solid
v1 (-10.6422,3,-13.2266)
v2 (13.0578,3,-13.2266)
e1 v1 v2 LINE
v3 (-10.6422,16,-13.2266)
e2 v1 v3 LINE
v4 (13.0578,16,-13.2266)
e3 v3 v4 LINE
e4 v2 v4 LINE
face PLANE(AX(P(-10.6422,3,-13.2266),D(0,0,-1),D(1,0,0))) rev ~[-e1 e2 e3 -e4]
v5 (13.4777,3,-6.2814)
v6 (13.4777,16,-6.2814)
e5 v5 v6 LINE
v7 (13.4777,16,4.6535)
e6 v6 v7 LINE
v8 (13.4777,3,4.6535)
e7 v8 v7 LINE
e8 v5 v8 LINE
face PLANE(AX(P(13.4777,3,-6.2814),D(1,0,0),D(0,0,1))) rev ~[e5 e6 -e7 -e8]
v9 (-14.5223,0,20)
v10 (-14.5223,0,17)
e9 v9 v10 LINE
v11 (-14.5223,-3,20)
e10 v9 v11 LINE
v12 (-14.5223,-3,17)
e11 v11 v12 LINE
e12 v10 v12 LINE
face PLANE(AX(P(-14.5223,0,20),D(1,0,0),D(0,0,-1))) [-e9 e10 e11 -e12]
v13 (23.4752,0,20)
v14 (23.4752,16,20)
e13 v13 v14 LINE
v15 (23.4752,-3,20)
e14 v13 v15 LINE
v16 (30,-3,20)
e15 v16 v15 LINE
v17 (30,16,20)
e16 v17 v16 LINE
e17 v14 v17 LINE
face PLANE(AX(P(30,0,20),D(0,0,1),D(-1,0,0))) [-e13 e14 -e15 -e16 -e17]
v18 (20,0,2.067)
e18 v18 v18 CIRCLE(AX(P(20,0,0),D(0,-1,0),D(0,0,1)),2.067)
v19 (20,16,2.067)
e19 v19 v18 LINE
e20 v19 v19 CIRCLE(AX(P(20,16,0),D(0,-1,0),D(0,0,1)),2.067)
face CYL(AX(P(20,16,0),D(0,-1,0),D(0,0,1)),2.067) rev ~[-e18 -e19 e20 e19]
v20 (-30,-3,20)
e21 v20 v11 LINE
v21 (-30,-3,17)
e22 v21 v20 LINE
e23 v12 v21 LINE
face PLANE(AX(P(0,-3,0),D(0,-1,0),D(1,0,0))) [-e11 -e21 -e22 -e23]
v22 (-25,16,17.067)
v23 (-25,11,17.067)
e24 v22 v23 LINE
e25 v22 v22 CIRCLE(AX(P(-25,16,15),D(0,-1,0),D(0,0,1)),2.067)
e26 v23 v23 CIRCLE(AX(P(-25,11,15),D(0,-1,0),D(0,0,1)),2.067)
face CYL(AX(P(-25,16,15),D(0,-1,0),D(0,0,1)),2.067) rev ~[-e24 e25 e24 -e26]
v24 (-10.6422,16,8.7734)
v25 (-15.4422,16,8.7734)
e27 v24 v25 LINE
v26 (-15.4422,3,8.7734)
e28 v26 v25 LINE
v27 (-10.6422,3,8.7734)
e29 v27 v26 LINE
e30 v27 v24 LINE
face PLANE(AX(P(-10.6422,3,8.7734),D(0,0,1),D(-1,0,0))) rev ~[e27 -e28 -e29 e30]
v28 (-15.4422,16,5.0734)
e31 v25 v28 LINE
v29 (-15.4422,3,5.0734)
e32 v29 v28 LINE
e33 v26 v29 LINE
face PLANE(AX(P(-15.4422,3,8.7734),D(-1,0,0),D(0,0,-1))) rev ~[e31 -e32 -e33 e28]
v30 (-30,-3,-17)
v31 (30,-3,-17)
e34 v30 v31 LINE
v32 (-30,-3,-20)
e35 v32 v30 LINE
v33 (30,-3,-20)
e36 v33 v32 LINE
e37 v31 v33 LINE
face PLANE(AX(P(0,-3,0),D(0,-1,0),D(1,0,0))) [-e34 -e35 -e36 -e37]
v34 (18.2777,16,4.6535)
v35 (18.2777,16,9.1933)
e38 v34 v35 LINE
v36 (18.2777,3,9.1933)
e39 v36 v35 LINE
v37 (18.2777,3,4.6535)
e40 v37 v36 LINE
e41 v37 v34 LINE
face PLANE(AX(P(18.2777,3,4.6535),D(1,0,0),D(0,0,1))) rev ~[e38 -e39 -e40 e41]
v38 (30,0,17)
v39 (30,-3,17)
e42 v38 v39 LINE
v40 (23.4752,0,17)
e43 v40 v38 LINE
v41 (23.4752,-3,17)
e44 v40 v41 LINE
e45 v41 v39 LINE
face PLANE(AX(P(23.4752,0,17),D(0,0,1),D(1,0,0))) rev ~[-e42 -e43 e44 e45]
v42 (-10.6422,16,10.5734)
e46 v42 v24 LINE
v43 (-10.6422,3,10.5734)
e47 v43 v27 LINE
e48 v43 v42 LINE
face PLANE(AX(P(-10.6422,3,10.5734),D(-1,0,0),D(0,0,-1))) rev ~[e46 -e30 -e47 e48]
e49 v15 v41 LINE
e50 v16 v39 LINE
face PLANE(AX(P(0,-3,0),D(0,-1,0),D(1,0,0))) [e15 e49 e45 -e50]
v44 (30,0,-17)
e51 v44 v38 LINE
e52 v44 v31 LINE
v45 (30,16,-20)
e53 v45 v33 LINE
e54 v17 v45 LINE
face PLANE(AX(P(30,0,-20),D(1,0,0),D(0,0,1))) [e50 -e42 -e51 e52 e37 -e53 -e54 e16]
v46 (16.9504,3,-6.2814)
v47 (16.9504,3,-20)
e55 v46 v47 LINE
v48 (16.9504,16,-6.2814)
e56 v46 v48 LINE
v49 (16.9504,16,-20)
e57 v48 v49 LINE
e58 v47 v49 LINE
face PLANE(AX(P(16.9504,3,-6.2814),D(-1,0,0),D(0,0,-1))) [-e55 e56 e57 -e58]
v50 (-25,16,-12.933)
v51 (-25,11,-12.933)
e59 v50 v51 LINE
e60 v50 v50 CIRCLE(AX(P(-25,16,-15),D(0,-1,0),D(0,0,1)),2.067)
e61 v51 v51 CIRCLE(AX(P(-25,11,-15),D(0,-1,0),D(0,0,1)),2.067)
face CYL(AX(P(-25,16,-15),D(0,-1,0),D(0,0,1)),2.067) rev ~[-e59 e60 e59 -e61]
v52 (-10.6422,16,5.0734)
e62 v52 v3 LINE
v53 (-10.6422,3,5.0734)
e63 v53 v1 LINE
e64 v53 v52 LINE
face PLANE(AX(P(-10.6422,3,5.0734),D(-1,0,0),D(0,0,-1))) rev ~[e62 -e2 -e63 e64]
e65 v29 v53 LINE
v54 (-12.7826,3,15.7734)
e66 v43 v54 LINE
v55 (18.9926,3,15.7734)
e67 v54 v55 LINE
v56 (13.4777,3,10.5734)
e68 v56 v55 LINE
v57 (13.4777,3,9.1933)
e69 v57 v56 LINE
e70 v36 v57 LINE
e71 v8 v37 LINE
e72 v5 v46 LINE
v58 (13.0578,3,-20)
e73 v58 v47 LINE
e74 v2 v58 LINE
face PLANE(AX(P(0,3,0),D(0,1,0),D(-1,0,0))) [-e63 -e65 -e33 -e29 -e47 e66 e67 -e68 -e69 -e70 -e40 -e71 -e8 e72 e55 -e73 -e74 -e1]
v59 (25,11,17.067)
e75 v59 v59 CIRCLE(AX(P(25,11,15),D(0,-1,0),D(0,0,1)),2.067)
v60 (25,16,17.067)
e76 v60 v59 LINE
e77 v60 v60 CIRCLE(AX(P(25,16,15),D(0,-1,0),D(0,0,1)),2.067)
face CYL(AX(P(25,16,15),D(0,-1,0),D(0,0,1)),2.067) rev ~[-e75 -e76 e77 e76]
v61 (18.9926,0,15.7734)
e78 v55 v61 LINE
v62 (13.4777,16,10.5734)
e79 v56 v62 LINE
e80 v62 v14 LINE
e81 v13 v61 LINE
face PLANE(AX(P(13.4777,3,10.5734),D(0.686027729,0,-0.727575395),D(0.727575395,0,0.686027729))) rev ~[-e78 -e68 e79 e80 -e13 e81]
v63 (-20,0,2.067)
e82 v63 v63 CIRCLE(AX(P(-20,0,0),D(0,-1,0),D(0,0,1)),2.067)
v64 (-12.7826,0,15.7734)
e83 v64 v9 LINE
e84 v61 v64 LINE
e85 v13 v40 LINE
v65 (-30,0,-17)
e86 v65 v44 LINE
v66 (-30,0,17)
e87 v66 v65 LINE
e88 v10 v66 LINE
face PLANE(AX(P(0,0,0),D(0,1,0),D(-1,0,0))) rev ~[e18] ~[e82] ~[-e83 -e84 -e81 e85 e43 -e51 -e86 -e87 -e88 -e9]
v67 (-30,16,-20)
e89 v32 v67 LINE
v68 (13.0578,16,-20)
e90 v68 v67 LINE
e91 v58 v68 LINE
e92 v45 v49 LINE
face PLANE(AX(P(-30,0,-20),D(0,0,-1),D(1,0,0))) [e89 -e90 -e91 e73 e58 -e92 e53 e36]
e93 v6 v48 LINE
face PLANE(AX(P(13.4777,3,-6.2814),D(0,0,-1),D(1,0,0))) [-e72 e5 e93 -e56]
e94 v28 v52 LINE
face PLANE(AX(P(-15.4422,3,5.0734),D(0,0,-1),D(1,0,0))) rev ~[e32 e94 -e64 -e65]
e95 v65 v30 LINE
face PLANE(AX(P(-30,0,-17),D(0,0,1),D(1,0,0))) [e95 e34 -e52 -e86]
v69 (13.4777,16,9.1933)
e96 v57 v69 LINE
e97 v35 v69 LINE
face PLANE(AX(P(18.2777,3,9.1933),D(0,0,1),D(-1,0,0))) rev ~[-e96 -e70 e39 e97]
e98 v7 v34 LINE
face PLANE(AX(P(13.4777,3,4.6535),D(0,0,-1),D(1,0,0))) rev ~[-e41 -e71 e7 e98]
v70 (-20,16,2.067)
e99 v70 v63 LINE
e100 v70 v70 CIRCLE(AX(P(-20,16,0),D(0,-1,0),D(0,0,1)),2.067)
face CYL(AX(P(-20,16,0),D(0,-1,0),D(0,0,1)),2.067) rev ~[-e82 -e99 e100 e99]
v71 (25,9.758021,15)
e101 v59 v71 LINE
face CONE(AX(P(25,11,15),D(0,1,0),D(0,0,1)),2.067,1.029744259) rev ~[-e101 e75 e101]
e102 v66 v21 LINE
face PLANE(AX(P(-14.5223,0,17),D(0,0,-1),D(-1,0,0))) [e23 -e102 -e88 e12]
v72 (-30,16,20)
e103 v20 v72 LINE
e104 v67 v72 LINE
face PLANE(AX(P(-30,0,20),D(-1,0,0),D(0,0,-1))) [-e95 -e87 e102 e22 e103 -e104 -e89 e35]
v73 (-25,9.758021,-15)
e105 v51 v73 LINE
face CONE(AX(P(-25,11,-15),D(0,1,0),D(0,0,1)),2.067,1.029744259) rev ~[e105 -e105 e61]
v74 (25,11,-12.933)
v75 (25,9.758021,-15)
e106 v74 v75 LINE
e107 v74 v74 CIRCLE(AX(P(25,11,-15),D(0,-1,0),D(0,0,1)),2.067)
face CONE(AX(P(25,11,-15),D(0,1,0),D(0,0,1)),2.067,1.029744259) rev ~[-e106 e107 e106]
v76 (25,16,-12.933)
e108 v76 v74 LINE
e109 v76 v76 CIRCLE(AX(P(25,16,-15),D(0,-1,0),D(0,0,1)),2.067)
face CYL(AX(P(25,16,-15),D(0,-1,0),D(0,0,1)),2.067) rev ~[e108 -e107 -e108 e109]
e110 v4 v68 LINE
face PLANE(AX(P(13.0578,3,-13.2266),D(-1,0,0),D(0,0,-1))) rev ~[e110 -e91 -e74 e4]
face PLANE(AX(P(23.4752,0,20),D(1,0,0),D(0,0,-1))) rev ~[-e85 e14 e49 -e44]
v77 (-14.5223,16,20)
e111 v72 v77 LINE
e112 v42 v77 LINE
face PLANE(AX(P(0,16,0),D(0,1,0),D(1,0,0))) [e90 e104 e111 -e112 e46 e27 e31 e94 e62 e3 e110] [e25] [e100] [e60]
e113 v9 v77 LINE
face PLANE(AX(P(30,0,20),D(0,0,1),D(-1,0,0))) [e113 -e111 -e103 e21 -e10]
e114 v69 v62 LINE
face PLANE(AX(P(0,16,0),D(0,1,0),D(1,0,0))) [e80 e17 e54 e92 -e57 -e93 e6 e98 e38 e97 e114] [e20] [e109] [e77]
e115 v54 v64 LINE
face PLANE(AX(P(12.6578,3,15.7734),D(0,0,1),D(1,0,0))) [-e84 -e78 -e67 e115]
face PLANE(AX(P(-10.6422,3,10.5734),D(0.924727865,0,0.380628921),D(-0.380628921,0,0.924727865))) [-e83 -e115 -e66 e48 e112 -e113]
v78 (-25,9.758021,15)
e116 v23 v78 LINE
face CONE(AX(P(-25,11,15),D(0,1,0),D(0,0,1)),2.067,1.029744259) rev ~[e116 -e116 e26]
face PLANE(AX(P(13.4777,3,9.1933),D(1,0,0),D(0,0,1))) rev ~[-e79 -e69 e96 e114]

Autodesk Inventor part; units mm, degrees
ref_plane "YZ Plane" through (0, 0, 0) normal (1, 0, 0) x (0, 1, 0)
ref_plane "XZ Plane" through (0, 0, 0) normal (0, 1, 0) x (-1, 0, 0)
ref_plane "XY Plane" through (0, 0, 0) normal (0, 0, 1) x (1, 0, 0)
sketch "Szkic1" plane through (0, 0, 0) normal (0, 1, 0) x (-1, 0, 0)
  line L0 (30, -20) -> (-30, -20)
  line L1 (-30, -20) -> (-30, 20)
  line L2 (-30, 20) -> (30, 20)
  line L3 (30, 20) -> (30, -20)
  line L4 (30, -20) -> (-30, 20) construction
  line L5 (-30, -20) -> (30, 20) construction
  point P0 (0, 0)
  dimension "d0" = 60
  dimension "d1" = 40
extrude "Wyciągnięcie proste1" add sketch "Szkic1" along normal blind 3
sketch "Szkic6" plane through (0, 3, 0) normal (0, 1, 0) x (1, 0, 0)
  line L0 (17.3578, -5.5734) -> (12.5578, -5.5734) projected
  line L1 (12.5578, -5.5734) -> (12.5578, 12.7266) projected
  line L2 (12.5578, 12.7266) -> (-10.1422, 12.7266) projected
  line L3 (-10.1422, -5.5734) -> (-10.1422, 12.7266) projected
  line L4 (-10.1422, -5.5734) -> (-14.9422, -5.5734) projected
  line L5 (-14.9422, -5.5734) -> (-14.9422, -8.2734) projected
  line L6 (-10.1422, -8.2734) -> (-14.9422, -8.2734) projected
  line L7 (-10.1422, -8.2734) -> (-10.1422, -10.0734) projected
  line L8 (-10.1422, -10.0734) -> (12.5578, -10.0734) construction
  line L9 (12.5578, -8.2734) -> (12.5578, -10.0734) projected
  line L10 (17.3578, -8.2734) -> (12.5578, -8.2734) projected
  line L11 (17.3578, -5.5734) -> (17.3578, -8.2734) projected
  line L12 (-8.8922, -2.4734) -> (11.3078, -2.4734) projected
  line L13 (-8.8922, 7.7266) -> (-8.8922, -2.4734) projected
  line L14 (11.3078, 7.7266) -> (-8.8922, 7.7266) projected
  line L15 (11.3078, -2.4734) -> (11.3078, 7.7266) projected
  line L16 (-30, -20) -> (30, -20) projected
  line L17 (30, -20) -> (30, 20) projected
  line L18 (30, -20) -> (30, 20)
  line L19 (-30, 20) -> (-30, -20)
  line L20 (-30, -20) -> (-14.5223, -20)
  line L21 (23.4752, -20) -> (30, -20)
  line L22 (-10.6422, 13.2266) -> (13.0578, 13.2266)
  line L23 (13.4777, 6.2814) -> (13.4777, -4.6535)
  line L24 (13.4777, -4.6535) -> (18.2777, -4.6535)
  line L25 (18.2777, -4.6535) -> (18.2777, -9.1933)
  line L26 (18.2777, -9.1933) -> (13.4777, -9.1933)
  line L27 (13.4777, -9.1933) -> (13.4777, -10.5734)
  line L28 (-10.6422, -10.5734) -> (-10.6422, -8.7734)
  line L29 (-10.6422, -8.7734) -> (-15.4422, -8.7734)
  line L30 (-15.4422, -8.7734) -> (-15.4422, -5.0734)
  line L31 (-15.4422, -5.0734) -> (-10.6422, -5.0734)
  line L32 (-10.6422, -5.0734) -> (-10.6422, 13.2266)
  line L33 (13.4777, -10.5734) -> (23.4752, -20)
  line L34 (-10.6422, -10.5734) -> (-14.5223, -20)
  line L35 (13.4777, 6.2814) -> (16.9504, 6.2814)
  line L36 (16.9504, 6.2814) -> (16.9504, 20)
  line L37 (13.0578, 13.2266) -> (13.0578, 20)
  line L38 (30, 20) -> (16.9504, 20)
  line L39 (13.0578, 20) -> (-30, 20)
  point P0 (0, 0)
  dimension "d4" = 0.5
extrude "Wyciągnięcie proste2" add sketch "Szkic6" along normal blind 13 contours L19 L39 L37 L22 L32 L31 L30 L29 L28 L34 L16 | L33 L27 L26 L25 L24 L23 L35 L36 L38 L17 L16
sketch "Szkic7" plane through (0, 3, 0) normal (0, 1, 0) x (1, 0, 0)
  line L0 (13.0578, 20) -> (13.0578, 13.2266) projected
  line L1 (13.0578, 13.2266) -> (-10.6422, 13.2266) projected
  line L2 (-10.6422, 13.2266) -> (-10.6422, -5.0734) projected
  line L3 (-10.6422, -5.0734) -> (-15.4422, -5.0734) projected
  line L4 (-15.4422, -5.0734) -> (-15.4422, -8.7734) projected
  line L5 (-15.4422, -8.7734) -> (-10.6422, -8.7734) projected
  line L6 (-10.6422, -8.7734) -> (-10.6422, -10.5734) projected
  line L7 (-10.6422, -10.5734) -> (-14.5223, -20) projected
  line L8 (-14.5223, -20) -> (23.4752, -20) projected
  line L9 (23.4752, -20) -> (13.4777, -10.5734) projected
  line L10 (13.4777, -10.5734) -> (13.4777, -9.1933) projected
  line L11 (13.4777, -9.1933) -> (18.2777, -9.1933) projected
  line L12 (18.2777, -9.1933) -> (18.2777, -4.6535) projected
  line L13 (18.2777, -4.6535) -> (13.4777, -4.6535) projected
  line L14 (13.4777, -4.6535) -> (13.4777, 6.2814) projected
  line L15 (13.4777, 6.2814) -> (16.9504, 6.2814) projected
  line L16 (16.9504, 6.2814) -> (16.9504, 20) projected
  line L17 (16.9504, 20) -> (13.0578, 20) projected
  line L18 (1.3504, -15.7734) -> (12.6578, -15.7734) projected
  line L19 (-12.7826, -15.7734) -> (18.9926, -15.7734)
  point P0 (0, 0)
  point P1 (12.6578, -15.7734)
  point P2 (1.3504, -15.7734)
extrude "Wyciągnięcie proste3" cut sketch "Szkic7" against normal blind 13 contours L19 L18 L9 L8 L7
sketch "Szkic8" plane through (0, 16, 0) normal (0, 1, 0) x (1, 0, 0)
  line L0 (-30, 20) -> (-30, -20) projected
  line L1 (-30, -20) -> (-14.5223, -20) projected
  line L2 (30, 20) -> (-30, 20) projected
  line L3 (-30, 0) -> (30, 0) construction
  line L4 (0, 20) -> (0, -29.6332) construction
  point P0 (0, 0)
  point P1 (-25, -15)
  point P2 (-25, 15)
  point P3 (25, 15)
  point P4 (25, -15)
  dimension "d9" = 5
  dimension "d10" = 5
hole "Otwór1" at (-25, 16, 15) at (-25, 16, -15) at (25, 16, -15) at (25, 16, 15) direction (0, -1, 0) diameter 4.134 depth 5 tip angle 118 thread size "M5x0.8" class "6H" standard "ISO Metric profile"
sketch "Szkic9" plane through (0, 0, 0) normal (0, -1, 0) x (1, 0, 0)
  line L0 (30, 20) -> (30, -20) projected
  line L1 (30, -20) -> (-30, -20)
  line L2 (-30, -20) -> (-30, -17)
  line L3 (-30, -17) -> (30, -17)
  line L4 (30, -17) -> (30, -20)
  line L5 (18.9926, 15.7734) -> (-12.7826, 15.7734) projected
  line L6 (30, 20) -> (23.4752, 20)
  line L7 (23.4752, 17) -> (30, 17)
  line L8 (30, 17) -> (30, 20)
  line L9 (23.4752, 20) -> (18.9926, 15.7734) projected
  line L10 (23.4752, 20) -> (23.4752, 17)
  line L11 (-30, 20) -> (-14.5223, 20) projected
  line L12 (-30, 20) -> (-14.5223, 20)
  line L13 (-14.5223, 17) -> (-30, 17)
  line L14 (-30, 17) -> (-30, 20)
  line L15 (-14.5223, 20) -> (-10.6422, 10.5734) projected
  line L16 (-14.5223, 20) -> (-14.5223, 17)
  point P0 (0, 0)
  dimension "d18" = 60
  dimension "d19" = 3
  dimension "d31" = 3
  dimension "d32" = 3
extrude "Wyciągnięcie proste4" add sketch "Szkic9" along normal blind 3
sketch "Szkic10" plane through (0, 16, 0) normal (0, 1, 0) x (1, 0, 0)
  line L0 (-30, 20) -> (-30, -20) projected
  line L1 (30, -20) -> (30, 20) projected
  point P0 (0, 0)
  point P1 (-20, 0)
  point P2 (20, 0)
  dimension "d22" = 10
  dimension "d23" = 10
hole "Otwór2" at (-20, 16, 0) at (20, 16, 0) direction (0, -1, 0) diameter 4.134 end through all thread size "M5x0.8" class "6H" standard "ISO Metric profile"
properties part number "Podstawa"
